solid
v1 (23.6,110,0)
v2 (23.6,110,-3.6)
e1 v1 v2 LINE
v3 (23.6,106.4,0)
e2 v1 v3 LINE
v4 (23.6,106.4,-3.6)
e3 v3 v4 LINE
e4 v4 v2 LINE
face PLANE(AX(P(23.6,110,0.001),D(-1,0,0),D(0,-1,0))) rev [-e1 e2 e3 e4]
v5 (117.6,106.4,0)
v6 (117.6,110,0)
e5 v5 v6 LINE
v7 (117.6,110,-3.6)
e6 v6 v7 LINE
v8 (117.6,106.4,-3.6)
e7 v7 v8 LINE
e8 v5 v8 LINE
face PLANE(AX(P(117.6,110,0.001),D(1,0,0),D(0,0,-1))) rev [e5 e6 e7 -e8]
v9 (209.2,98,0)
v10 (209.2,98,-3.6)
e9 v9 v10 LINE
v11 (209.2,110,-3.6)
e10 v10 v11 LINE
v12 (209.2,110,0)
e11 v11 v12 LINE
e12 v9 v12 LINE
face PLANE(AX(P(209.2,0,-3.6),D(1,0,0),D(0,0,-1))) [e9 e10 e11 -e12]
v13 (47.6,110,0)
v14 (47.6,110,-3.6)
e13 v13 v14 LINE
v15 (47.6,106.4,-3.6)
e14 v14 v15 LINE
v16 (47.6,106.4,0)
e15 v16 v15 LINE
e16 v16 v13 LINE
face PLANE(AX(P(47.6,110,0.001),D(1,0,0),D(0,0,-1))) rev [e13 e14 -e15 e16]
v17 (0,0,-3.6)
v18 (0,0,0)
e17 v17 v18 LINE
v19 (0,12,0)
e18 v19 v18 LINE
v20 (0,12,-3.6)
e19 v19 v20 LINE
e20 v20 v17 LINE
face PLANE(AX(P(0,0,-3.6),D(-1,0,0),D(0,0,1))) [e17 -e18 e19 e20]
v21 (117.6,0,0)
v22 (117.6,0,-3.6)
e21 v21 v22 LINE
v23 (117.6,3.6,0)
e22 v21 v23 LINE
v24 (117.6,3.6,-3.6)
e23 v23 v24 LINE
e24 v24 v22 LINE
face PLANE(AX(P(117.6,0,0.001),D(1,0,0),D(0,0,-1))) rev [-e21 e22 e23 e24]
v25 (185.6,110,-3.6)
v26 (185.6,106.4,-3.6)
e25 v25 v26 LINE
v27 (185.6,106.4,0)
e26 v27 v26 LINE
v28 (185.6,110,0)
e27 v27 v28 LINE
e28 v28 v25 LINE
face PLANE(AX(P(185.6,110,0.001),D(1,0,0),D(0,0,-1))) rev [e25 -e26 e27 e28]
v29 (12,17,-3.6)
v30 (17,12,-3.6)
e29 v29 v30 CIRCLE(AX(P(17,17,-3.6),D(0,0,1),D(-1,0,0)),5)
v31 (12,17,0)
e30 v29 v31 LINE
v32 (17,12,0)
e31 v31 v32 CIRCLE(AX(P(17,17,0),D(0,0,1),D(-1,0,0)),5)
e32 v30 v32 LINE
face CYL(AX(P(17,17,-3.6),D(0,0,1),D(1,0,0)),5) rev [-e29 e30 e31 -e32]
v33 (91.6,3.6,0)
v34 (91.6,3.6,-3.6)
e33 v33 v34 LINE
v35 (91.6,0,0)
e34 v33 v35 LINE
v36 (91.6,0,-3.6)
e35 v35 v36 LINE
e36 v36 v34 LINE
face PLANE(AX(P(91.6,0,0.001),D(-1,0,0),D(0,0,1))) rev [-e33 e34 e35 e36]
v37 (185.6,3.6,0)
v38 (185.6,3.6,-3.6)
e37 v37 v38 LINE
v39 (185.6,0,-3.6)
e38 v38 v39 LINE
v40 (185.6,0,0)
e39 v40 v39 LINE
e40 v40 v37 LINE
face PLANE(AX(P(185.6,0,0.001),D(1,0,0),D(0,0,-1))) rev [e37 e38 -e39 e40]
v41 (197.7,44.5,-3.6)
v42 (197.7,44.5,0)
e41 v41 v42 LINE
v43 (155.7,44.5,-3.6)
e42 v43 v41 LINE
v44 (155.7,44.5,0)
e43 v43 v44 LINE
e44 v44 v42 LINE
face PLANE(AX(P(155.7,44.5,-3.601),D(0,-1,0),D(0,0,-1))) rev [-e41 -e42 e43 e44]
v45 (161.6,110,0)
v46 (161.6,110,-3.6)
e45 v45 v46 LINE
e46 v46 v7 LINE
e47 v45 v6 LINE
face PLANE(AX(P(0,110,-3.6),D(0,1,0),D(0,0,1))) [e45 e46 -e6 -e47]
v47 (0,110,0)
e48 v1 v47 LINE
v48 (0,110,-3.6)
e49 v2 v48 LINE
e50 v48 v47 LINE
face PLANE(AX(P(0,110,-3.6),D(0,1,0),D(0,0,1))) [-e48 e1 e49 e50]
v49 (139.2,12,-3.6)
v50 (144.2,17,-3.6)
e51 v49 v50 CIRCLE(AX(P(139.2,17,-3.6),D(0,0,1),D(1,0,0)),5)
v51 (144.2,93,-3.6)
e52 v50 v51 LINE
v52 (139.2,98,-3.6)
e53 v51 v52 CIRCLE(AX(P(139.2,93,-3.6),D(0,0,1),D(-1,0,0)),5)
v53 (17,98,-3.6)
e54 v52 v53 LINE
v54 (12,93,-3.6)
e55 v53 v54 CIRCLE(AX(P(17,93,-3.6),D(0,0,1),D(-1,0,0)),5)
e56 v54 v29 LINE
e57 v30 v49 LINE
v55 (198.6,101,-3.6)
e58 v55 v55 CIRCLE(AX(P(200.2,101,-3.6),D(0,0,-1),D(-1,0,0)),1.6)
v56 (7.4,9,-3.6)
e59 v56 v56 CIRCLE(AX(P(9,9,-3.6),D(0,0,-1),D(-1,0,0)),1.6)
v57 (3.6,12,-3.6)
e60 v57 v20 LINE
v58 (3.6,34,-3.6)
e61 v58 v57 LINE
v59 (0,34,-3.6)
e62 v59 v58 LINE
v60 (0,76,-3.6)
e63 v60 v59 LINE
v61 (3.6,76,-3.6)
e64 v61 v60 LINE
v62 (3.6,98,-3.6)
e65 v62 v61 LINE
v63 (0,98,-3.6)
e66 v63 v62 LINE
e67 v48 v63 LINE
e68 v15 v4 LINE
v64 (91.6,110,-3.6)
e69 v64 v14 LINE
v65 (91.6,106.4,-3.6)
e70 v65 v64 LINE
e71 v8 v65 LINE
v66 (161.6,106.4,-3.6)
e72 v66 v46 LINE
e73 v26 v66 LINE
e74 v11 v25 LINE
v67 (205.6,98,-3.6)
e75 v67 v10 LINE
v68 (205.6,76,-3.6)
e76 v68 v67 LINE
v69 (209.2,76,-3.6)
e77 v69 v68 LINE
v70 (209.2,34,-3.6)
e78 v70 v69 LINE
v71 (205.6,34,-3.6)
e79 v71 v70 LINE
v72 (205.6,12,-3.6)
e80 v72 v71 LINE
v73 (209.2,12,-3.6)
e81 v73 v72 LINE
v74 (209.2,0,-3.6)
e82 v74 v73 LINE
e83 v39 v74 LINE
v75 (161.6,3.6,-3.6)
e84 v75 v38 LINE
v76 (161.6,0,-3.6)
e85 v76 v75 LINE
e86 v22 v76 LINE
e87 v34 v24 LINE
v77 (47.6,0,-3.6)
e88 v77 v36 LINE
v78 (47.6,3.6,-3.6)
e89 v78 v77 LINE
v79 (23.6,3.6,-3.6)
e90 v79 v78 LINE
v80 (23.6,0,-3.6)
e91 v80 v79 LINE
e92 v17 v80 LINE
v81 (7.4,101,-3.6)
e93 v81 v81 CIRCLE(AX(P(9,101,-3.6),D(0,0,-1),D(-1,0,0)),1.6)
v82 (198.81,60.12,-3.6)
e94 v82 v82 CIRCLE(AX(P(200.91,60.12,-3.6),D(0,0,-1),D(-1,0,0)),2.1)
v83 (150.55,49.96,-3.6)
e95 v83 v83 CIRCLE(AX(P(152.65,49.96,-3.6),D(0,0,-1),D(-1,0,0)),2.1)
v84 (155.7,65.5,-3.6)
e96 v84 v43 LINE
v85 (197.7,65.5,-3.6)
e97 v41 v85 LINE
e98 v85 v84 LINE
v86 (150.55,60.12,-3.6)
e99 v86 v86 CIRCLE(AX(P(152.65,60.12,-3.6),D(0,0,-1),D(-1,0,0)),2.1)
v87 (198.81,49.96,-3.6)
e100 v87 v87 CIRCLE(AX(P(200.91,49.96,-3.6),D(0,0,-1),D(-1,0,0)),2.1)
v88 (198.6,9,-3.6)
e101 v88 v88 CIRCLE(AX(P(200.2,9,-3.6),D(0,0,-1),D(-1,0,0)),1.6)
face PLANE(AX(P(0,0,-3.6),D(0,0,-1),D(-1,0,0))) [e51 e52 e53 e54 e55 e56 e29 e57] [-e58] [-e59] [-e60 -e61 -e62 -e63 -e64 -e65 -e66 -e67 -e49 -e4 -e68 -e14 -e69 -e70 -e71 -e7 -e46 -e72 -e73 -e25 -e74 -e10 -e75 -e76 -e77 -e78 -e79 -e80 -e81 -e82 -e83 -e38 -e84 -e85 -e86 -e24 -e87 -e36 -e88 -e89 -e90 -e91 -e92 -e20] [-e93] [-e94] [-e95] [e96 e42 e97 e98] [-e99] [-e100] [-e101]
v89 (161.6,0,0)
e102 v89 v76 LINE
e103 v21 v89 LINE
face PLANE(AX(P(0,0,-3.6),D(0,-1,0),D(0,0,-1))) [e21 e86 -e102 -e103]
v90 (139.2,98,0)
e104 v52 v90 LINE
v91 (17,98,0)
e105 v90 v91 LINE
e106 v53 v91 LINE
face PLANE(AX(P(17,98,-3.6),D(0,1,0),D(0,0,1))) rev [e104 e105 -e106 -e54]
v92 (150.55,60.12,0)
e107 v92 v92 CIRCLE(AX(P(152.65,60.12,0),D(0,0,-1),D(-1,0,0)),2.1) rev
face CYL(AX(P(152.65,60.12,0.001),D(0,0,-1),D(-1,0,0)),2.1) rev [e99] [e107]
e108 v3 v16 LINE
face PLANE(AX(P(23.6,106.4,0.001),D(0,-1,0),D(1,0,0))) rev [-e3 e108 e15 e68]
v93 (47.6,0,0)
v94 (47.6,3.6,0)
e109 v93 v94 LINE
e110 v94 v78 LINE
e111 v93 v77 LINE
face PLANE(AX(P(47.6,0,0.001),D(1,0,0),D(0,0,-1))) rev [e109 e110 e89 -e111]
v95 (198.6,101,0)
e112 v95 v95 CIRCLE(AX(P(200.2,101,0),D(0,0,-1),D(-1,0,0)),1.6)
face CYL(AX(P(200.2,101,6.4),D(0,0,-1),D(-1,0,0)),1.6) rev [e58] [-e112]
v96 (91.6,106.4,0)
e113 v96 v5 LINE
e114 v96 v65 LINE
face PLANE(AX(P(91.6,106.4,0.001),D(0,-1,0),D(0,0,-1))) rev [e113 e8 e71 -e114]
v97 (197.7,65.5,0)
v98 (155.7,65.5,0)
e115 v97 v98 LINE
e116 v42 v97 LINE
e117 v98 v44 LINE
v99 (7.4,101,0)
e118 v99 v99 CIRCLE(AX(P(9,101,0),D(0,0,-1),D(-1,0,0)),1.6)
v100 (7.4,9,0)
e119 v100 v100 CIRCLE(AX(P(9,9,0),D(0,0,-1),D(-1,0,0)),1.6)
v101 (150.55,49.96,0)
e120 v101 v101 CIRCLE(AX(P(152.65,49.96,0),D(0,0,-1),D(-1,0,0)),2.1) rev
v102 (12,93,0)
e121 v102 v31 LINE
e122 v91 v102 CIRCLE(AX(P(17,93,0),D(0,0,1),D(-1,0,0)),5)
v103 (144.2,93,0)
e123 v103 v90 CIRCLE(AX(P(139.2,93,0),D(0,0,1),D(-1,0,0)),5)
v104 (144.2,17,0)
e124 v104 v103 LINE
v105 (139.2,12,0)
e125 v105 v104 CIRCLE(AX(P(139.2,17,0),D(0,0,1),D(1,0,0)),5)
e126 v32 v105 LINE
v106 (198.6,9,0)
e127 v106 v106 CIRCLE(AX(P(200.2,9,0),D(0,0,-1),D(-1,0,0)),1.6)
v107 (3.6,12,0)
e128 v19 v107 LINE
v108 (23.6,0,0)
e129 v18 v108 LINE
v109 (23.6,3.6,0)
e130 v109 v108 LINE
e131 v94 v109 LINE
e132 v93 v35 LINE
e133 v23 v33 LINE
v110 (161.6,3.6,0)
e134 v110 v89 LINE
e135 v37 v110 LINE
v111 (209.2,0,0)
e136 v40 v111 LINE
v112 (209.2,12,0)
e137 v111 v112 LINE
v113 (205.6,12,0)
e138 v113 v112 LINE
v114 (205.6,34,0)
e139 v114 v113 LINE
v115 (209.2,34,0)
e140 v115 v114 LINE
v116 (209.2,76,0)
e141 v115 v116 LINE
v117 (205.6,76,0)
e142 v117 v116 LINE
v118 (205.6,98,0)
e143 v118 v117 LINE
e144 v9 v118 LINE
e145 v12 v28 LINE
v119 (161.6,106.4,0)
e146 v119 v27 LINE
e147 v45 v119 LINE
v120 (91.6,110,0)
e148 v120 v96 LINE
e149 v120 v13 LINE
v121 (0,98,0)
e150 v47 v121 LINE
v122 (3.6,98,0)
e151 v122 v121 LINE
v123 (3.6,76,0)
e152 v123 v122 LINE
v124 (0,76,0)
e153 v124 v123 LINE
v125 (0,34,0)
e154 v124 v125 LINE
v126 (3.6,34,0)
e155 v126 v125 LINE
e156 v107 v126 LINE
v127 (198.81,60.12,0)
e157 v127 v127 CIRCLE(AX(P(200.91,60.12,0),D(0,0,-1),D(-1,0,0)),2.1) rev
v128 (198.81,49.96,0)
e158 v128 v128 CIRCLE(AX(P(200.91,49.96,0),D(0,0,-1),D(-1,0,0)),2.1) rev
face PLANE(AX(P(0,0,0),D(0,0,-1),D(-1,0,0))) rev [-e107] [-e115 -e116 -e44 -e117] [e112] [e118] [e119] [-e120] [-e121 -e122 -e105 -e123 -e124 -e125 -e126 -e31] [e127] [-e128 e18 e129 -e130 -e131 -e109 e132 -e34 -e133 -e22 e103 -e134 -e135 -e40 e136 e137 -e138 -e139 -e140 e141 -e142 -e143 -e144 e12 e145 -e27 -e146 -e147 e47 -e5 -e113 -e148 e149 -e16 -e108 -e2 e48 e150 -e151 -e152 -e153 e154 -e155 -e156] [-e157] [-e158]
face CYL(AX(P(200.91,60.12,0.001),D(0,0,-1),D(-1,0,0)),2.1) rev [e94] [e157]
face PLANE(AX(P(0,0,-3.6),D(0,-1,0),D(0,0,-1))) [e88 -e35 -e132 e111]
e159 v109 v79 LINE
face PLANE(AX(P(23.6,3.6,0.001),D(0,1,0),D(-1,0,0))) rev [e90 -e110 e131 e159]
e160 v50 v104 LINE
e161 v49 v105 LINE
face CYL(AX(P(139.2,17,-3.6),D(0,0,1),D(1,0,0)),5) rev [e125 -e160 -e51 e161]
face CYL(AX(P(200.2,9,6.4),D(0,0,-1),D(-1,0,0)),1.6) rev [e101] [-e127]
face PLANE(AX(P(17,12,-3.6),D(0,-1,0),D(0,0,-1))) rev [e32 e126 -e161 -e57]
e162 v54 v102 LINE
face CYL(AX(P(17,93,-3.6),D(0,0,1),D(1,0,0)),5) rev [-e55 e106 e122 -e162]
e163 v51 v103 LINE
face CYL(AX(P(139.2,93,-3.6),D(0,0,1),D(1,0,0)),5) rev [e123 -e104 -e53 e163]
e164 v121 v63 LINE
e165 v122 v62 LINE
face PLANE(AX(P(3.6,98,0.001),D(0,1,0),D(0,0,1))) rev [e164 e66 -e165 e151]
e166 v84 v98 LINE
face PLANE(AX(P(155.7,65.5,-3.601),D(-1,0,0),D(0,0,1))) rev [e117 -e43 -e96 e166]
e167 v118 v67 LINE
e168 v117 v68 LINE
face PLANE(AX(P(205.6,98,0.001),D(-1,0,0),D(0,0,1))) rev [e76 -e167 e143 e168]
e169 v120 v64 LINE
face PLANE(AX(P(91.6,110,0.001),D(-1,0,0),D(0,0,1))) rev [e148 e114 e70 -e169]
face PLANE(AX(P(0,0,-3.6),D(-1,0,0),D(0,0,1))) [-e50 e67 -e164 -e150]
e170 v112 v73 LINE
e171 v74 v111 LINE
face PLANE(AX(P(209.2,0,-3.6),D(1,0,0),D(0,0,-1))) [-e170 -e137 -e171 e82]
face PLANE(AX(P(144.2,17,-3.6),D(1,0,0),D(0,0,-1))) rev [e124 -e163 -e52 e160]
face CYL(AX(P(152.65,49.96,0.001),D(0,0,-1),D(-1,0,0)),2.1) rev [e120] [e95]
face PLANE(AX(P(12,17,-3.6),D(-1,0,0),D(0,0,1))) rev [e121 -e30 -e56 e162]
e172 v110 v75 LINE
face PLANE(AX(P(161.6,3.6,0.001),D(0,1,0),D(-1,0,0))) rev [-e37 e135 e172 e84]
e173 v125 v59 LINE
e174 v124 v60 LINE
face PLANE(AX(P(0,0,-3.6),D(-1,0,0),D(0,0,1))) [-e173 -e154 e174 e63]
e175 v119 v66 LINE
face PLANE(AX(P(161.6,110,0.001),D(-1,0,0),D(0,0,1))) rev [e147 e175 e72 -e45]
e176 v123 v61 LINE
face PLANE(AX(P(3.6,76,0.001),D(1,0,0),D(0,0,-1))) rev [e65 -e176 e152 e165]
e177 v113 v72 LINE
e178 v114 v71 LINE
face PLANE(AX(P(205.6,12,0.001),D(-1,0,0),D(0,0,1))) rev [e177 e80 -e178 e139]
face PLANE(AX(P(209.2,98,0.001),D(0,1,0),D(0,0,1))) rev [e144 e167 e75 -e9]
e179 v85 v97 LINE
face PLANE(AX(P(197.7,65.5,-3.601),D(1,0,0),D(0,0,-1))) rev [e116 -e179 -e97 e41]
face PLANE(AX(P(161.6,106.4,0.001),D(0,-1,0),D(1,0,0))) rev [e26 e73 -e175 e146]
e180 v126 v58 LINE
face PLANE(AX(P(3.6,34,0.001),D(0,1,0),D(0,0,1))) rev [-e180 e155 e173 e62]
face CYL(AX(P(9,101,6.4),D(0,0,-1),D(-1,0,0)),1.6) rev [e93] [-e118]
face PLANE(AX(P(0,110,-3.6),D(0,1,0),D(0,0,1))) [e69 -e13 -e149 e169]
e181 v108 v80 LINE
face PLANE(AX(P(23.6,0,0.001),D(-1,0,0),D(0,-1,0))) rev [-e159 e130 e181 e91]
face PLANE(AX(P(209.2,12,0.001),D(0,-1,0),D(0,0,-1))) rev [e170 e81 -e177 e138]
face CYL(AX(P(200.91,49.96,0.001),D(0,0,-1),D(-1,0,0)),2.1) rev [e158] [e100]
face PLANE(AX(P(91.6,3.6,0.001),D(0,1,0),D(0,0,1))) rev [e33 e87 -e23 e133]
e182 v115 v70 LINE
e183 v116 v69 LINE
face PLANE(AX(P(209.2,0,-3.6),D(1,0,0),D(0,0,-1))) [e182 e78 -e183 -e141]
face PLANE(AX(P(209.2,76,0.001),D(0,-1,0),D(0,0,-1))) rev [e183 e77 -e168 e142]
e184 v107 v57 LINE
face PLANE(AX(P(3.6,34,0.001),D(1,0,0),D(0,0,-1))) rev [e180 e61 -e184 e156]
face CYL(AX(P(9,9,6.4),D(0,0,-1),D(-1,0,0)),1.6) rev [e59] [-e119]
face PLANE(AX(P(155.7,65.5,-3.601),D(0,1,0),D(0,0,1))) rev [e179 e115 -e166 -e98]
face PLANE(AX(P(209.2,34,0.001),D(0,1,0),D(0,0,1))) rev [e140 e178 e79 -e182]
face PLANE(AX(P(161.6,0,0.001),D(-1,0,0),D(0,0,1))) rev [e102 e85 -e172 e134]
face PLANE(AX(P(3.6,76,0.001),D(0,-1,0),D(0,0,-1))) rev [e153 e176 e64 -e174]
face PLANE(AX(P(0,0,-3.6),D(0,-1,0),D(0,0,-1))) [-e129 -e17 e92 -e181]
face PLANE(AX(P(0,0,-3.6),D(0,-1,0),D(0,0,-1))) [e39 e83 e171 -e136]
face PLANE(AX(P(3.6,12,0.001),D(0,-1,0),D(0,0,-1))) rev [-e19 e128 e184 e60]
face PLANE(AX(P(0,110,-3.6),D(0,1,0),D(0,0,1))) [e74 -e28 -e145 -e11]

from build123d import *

# Parameters (mm, degrees)
SKETCH_1_W             = 209.2
SKETCH_1_H             = 110
SM_BASE_FLANGE_1_DEPTH = 3.6
CUT_EXTRUDE_1_REACH    = 238.384
SKETCH_6_W             = 42
SKETCH_6_H             = 21
CUT_EXTRUDE_2_REACH    = 238.384
SKETCH_7_W             = 3.6
SKETCH_7_H             = 22
SKETCH_7_W_2           = 24
SKETCH_7_H_2           = 3.6
SKETCH_7_W_3           = 26
SKETCH_8_R             = 1.6
CUT_EXTRUDE_3_DEPTH    = 10
CUT_EXTRUDE_4_REACH    = 238.384
SKETCH_9_R             = 2.1


# Sheet-metal steps are written as plain solids
with BuildPart() as part:
    # Sketch 1 → Базовая кромка1 (new body)
    with BuildSketch(Plane.XY):
        with Locations((104.6, 55)):
            Rectangle(SKETCH_1_W, SKETCH_1_H)
        with BuildLine():
            Line((17, 12), (139.2, 12))
            ThreePointArc((139.2, 12), (142.735533906, 13.464466094), (144.2, 17))
            Line((144.2, 17), (144.2, 93))
            ThreePointArc((144.2, 93), (142.735533906, 96.535533906), (139.2, 98))
            Line((139.2, 98), (17, 98))
            ThreePointArc((17, 98), (13.464466094, 96.535533906), (12, 93))
            Line((12, 93), (12, 17))
            ThreePointArc((12, 17), (13.464466094, 13.464466094), (17, 12))
        make_face(mode=Mode.SUBTRACT)
    extrude(amount=-SM_BASE_FLANGE_1_DEPTH)

    # Эскиз6 → Вырез-Вытянуть1 (cut, up to next)
    with BuildSketch(Plane.XY, mode=Mode.PRIVATE) as cut_extrude_1_sk1:
        with Locations((176.7, 55)):
            Rectangle(SKETCH_6_W, SKETCH_6_H)
    cut_extrude_1_tool1 = extrude(cut_extrude_1_sk1.sketch, amount=-CUT_EXTRUDE_1_REACH, mode=Mode.PRIVATE) & part.part
    add(cut_extrude_1_tool1.solids().sort_by_distance((176.7, 55, 0))[0], mode=Mode.SUBTRACT)

    # Эскиз7 → Вырез-Вытянуть2 (cut, up to next)
    with BuildSketch(Plane(origin=(0, 0, -3.6), x_dir=(-1, 0, 0), z_dir=(0, 0, -1)), mode=Mode.PRIVATE) as cut_extrude_2_sk1:
        with Locations((-1.8, 87)):
            Rectangle(SKETCH_7_W, SKETCH_7_H)
    cut_extrude_2_tool1 = extrude(cut_extrude_2_sk1.sketch, amount=-CUT_EXTRUDE_2_REACH, mode=Mode.PRIVATE) & part.part
    # Эскиз7 → Вырез-Вытянуть2 (cut, up to next)
    with BuildSketch(Plane(origin=(0, 0, -3.6), x_dir=(-1, 0, 0), z_dir=(0, 0, -1)), mode=Mode.PRIVATE) as cut_extrude_2_sk2:
        with Locations((-35.6, 108.2)):
            Rectangle(SKETCH_7_W_2, SKETCH_7_H_2)
    cut_extrude_2_tool2 = extrude(cut_extrude_2_sk2.sketch, amount=-CUT_EXTRUDE_2_REACH, mode=Mode.PRIVATE) & part.part
    # Эскиз7 → Вырез-Вытянуть2 (cut, up to next)
    with BuildSketch(Plane(origin=(0, 0, -3.6), x_dir=(-1, 0, 0), z_dir=(0, 0, -1)), mode=Mode.PRIVATE) as cut_extrude_2_sk3:
        with Locations((-104.6, 108.2)):
            Rectangle(SKETCH_7_W_3, SKETCH_7_H_2)
    cut_extrude_2_tool3 = extrude(cut_extrude_2_sk3.sketch, amount=-CUT_EXTRUDE_2_REACH, mode=Mode.PRIVATE) & part.part
    # Эскиз7 → Вырез-Вытянуть2 (cut, up to next)
    with BuildSketch(Plane(origin=(0, 0, -3.6), x_dir=(-1, 0, 0), z_dir=(0, 0, -1)), mode=Mode.PRIVATE) as cut_extrude_2_sk4:
        with Locations((-173.6, 108.2)):
            Rectangle(SKETCH_7_W_2, SKETCH_7_H_2)
    cut_extrude_2_tool4 = extrude(cut_extrude_2_sk4.sketch, amount=-CUT_EXTRUDE_2_REACH, mode=Mode.PRIVATE) & part.part
    # Эскиз7 → Вырез-Вытянуть2 (cut, up to next)
    with BuildSketch(Plane(origin=(0, 0, -3.6), x_dir=(-1, 0, 0), z_dir=(0, 0, -1)), mode=Mode.PRIVATE) as cut_extrude_2_sk5:
        with Locations((-207.4, 87)):
            Rectangle(SKETCH_7_W, SKETCH_7_H)
    cut_extrude_2_tool5 = extrude(cut_extrude_2_sk5.sketch, amount=-CUT_EXTRUDE_2_REACH, mode=Mode.PRIVATE) & part.part
    # Эскиз7 → Вырез-Вытянуть2 (cut, up to next)
    with BuildSketch(Plane(origin=(0, 0, -3.6), x_dir=(-1, 0, 0), z_dir=(0, 0, -1)), mode=Mode.PRIVATE) as cut_extrude_2_sk6:
        with Locations((-207.4, 23)):
            Rectangle(SKETCH_7_W, SKETCH_7_H)
    cut_extrude_2_tool6 = extrude(cut_extrude_2_sk6.sketch, amount=-CUT_EXTRUDE_2_REACH, mode=Mode.PRIVATE) & part.part
    # Эскиз7 → Вырез-Вытянуть2 (cut, up to next)
    with BuildSketch(Plane(origin=(0, 0, -3.6), x_dir=(-1, 0, 0), z_dir=(0, 0, -1)), mode=Mode.PRIVATE) as cut_extrude_2_sk7:
        with Locations((-173.6, 1.8)):
            Rectangle(SKETCH_7_W_2, SKETCH_7_H_2)
    cut_extrude_2_tool7 = extrude(cut_extrude_2_sk7.sketch, amount=-CUT_EXTRUDE_2_REACH, mode=Mode.PRIVATE) & part.part
    # Эскиз7 → Вырез-Вытянуть2 (cut, up to next)
    with BuildSketch(Plane(origin=(0, 0, -3.6), x_dir=(-1, 0, 0), z_dir=(0, 0, -1)), mode=Mode.PRIVATE) as cut_extrude_2_sk8:
        with Locations((-104.6, 1.8)):
            Rectangle(SKETCH_7_W_3, SKETCH_7_H_2)
    cut_extrude_2_tool8 = extrude(cut_extrude_2_sk8.sketch, amount=-CUT_EXTRUDE_2_REACH, mode=Mode.PRIVATE) & part.part
    # Эскиз7 → Вырез-Вытянуть2 (cut, up to next)
    with BuildSketch(Plane(origin=(0, 0, -3.6), x_dir=(-1, 0, 0), z_dir=(0, 0, -1)), mode=Mode.PRIVATE) as cut_extrude_2_sk9:
        with Locations((-35.6, 1.8)):
            Rectangle(SKETCH_7_W_2, SKETCH_7_H_2)
    cut_extrude_2_tool9 = extrude(cut_extrude_2_sk9.sketch, amount=-CUT_EXTRUDE_2_REACH, mode=Mode.PRIVATE) & part.part
    # Эскиз7 → Вырез-Вытянуть2 (cut, up to next)
    with BuildSketch(Plane(origin=(0, 0, -3.6), x_dir=(-1, 0, 0), z_dir=(0, 0, -1)), mode=Mode.PRIVATE) as cut_extrude_2_sk10:
        with Locations((-1.8, 23)):
            Rectangle(SKETCH_7_W, SKETCH_7_H)
    cut_extrude_2_tool10 = extrude(cut_extrude_2_sk10.sketch, amount=-CUT_EXTRUDE_2_REACH, mode=Mode.PRIVATE) & part.part
    add(cut_extrude_2_tool1.solids().sort_by_distance((1.8, 87, -3.6))[0], mode=Mode.SUBTRACT)
    add(cut_extrude_2_tool2.solids().sort_by_distance((35.6, 108.2, -3.6))[0], mode=Mode.SUBTRACT)
    add(cut_extrude_2_tool3.solids().sort_by_distance((104.6, 108.2, -3.6))[0], mode=Mode.SUBTRACT)
    add(cut_extrude_2_tool4.solids().sort_by_distance((173.6, 108.2, -3.6))[0], mode=Mode.SUBTRACT)
    add(cut_extrude_2_tool5.solids().sort_by_distance((207.4, 87, -3.6))[0], mode=Mode.SUBTRACT)
    add(cut_extrude_2_tool6.solids().sort_by_distance((207.4, 23, -3.6))[0], mode=Mode.SUBTRACT)
    add(cut_extrude_2_tool7.solids().sort_by_distance((173.6, 1.8, -3.6))[0], mode=Mode.SUBTRACT)
    add(cut_extrude_2_tool8.solids().sort_by_distance((104.6, 1.8, -3.6))[0], mode=Mode.SUBTRACT)
    add(cut_extrude_2_tool9.solids().sort_by_distance((35.6, 1.8, -3.6))[0], mode=Mode.SUBTRACT)
    add(cut_extrude_2_tool10.solids().sort_by_distance((1.8, 23, -3.6))[0], mode=Mode.SUBTRACT)

    # Эскиз8 → Вырез-Вытянуть3 (cut)
    with BuildSketch(Plane(origin=(0, 0, -3.6), x_dir=(-1, 0, 0), z_dir=(0, 0, -1))):
        with Locations((-200.2, 9)):
            Circle(SKETCH_8_R)
        with Locations((-9, 9)):
            Circle(SKETCH_8_R)
        with Locations((-9, 101)):
            Circle(SKETCH_8_R)
        with Locations((-200.2, 101)):
            Circle(SKETCH_8_R)
    extrude(amount=-CUT_EXTRUDE_3_DEPTH, mode=Mode.SUBTRACT)

    # Эскиз9 → Вырез-Вытянуть4 (cut, up to next)
    with BuildSketch(Plane(origin=(0, 0, -3.6), x_dir=(-1, 0, 0), z_dir=(0, 0, -1)), mode=Mode.PRIVATE) as cut_extrude_4_sk1:
        with Locations((-200.91, 60.12)):
            Circle(SKETCH_9_R)
    cut_extrude_4_tool1 = extrude(cut_extrude_4_sk1.sketch, amount=-CUT_EXTRUDE_4_REACH, mode=Mode.PRIVATE) & part.part
    # Эскиз9 → Вырез-Вытянуть4 (cut, up to next)
    with BuildSketch(Plane(origin=(0, 0, -3.6), x_dir=(-1, 0, 0), z_dir=(0, 0, -1)), mode=Mode.PRIVATE) as cut_extrude_4_sk2:
        with Locations((-200.91, 49.96)):
            Circle(SKETCH_9_R)
    cut_extrude_4_tool2 = extrude(cut_extrude_4_sk2.sketch, amount=-CUT_EXTRUDE_4_REACH, mode=Mode.PRIVATE) & part.part
    # Эскиз9 → Вырез-Вытянуть4 (cut, up to next)
    with BuildSketch(Plane(origin=(0, 0, -3.6), x_dir=(-1, 0, 0), z_dir=(0, 0, -1)), mode=Mode.PRIVATE) as cut_extrude_4_sk3:
        with Locations((-152.65, 60.12)):
            Circle(SKETCH_9_R)
    cut_extrude_4_tool3 = extrude(cut_extrude_4_sk3.sketch, amount=-CUT_EXTRUDE_4_REACH, mode=Mode.PRIVATE) & part.part
    # Эскиз9 → Вырез-Вытянуть4 (cut, up to next)
    with BuildSketch(Plane(origin=(0, 0, -3.6), x_dir=(-1, 0, 0), z_dir=(0, 0, -1)), mode=Mode.PRIVATE) as cut_extrude_4_sk4:
        with Locations((-152.65, 49.96)):
            Circle(SKETCH_9_R)
    cut_extrude_4_tool4 = extrude(cut_extrude_4_sk4.sketch, amount=-CUT_EXTRUDE_4_REACH, mode=Mode.PRIVATE) & part.part
    add(cut_extrude_4_tool1.solids().sort_by_distance((200.91, 60.12, -3.6))[0], mode=Mode.SUBTRACT)
    add(cut_extrude_4_tool2.solids().sort_by_distance((200.91, 49.96, -3.6))[0], mode=Mode.SUBTRACT)
    add(cut_extrude_4_tool3.solids().sort_by_distance((152.65, 60.12, -3.6))[0], mode=Mode.SUBTRACT)
    add(cut_extrude_4_tool4.solids().sort_by_distance((152.65, 49.96, -3.6))[0], mode=Mode.SUBTRACT)


solid = part.part
